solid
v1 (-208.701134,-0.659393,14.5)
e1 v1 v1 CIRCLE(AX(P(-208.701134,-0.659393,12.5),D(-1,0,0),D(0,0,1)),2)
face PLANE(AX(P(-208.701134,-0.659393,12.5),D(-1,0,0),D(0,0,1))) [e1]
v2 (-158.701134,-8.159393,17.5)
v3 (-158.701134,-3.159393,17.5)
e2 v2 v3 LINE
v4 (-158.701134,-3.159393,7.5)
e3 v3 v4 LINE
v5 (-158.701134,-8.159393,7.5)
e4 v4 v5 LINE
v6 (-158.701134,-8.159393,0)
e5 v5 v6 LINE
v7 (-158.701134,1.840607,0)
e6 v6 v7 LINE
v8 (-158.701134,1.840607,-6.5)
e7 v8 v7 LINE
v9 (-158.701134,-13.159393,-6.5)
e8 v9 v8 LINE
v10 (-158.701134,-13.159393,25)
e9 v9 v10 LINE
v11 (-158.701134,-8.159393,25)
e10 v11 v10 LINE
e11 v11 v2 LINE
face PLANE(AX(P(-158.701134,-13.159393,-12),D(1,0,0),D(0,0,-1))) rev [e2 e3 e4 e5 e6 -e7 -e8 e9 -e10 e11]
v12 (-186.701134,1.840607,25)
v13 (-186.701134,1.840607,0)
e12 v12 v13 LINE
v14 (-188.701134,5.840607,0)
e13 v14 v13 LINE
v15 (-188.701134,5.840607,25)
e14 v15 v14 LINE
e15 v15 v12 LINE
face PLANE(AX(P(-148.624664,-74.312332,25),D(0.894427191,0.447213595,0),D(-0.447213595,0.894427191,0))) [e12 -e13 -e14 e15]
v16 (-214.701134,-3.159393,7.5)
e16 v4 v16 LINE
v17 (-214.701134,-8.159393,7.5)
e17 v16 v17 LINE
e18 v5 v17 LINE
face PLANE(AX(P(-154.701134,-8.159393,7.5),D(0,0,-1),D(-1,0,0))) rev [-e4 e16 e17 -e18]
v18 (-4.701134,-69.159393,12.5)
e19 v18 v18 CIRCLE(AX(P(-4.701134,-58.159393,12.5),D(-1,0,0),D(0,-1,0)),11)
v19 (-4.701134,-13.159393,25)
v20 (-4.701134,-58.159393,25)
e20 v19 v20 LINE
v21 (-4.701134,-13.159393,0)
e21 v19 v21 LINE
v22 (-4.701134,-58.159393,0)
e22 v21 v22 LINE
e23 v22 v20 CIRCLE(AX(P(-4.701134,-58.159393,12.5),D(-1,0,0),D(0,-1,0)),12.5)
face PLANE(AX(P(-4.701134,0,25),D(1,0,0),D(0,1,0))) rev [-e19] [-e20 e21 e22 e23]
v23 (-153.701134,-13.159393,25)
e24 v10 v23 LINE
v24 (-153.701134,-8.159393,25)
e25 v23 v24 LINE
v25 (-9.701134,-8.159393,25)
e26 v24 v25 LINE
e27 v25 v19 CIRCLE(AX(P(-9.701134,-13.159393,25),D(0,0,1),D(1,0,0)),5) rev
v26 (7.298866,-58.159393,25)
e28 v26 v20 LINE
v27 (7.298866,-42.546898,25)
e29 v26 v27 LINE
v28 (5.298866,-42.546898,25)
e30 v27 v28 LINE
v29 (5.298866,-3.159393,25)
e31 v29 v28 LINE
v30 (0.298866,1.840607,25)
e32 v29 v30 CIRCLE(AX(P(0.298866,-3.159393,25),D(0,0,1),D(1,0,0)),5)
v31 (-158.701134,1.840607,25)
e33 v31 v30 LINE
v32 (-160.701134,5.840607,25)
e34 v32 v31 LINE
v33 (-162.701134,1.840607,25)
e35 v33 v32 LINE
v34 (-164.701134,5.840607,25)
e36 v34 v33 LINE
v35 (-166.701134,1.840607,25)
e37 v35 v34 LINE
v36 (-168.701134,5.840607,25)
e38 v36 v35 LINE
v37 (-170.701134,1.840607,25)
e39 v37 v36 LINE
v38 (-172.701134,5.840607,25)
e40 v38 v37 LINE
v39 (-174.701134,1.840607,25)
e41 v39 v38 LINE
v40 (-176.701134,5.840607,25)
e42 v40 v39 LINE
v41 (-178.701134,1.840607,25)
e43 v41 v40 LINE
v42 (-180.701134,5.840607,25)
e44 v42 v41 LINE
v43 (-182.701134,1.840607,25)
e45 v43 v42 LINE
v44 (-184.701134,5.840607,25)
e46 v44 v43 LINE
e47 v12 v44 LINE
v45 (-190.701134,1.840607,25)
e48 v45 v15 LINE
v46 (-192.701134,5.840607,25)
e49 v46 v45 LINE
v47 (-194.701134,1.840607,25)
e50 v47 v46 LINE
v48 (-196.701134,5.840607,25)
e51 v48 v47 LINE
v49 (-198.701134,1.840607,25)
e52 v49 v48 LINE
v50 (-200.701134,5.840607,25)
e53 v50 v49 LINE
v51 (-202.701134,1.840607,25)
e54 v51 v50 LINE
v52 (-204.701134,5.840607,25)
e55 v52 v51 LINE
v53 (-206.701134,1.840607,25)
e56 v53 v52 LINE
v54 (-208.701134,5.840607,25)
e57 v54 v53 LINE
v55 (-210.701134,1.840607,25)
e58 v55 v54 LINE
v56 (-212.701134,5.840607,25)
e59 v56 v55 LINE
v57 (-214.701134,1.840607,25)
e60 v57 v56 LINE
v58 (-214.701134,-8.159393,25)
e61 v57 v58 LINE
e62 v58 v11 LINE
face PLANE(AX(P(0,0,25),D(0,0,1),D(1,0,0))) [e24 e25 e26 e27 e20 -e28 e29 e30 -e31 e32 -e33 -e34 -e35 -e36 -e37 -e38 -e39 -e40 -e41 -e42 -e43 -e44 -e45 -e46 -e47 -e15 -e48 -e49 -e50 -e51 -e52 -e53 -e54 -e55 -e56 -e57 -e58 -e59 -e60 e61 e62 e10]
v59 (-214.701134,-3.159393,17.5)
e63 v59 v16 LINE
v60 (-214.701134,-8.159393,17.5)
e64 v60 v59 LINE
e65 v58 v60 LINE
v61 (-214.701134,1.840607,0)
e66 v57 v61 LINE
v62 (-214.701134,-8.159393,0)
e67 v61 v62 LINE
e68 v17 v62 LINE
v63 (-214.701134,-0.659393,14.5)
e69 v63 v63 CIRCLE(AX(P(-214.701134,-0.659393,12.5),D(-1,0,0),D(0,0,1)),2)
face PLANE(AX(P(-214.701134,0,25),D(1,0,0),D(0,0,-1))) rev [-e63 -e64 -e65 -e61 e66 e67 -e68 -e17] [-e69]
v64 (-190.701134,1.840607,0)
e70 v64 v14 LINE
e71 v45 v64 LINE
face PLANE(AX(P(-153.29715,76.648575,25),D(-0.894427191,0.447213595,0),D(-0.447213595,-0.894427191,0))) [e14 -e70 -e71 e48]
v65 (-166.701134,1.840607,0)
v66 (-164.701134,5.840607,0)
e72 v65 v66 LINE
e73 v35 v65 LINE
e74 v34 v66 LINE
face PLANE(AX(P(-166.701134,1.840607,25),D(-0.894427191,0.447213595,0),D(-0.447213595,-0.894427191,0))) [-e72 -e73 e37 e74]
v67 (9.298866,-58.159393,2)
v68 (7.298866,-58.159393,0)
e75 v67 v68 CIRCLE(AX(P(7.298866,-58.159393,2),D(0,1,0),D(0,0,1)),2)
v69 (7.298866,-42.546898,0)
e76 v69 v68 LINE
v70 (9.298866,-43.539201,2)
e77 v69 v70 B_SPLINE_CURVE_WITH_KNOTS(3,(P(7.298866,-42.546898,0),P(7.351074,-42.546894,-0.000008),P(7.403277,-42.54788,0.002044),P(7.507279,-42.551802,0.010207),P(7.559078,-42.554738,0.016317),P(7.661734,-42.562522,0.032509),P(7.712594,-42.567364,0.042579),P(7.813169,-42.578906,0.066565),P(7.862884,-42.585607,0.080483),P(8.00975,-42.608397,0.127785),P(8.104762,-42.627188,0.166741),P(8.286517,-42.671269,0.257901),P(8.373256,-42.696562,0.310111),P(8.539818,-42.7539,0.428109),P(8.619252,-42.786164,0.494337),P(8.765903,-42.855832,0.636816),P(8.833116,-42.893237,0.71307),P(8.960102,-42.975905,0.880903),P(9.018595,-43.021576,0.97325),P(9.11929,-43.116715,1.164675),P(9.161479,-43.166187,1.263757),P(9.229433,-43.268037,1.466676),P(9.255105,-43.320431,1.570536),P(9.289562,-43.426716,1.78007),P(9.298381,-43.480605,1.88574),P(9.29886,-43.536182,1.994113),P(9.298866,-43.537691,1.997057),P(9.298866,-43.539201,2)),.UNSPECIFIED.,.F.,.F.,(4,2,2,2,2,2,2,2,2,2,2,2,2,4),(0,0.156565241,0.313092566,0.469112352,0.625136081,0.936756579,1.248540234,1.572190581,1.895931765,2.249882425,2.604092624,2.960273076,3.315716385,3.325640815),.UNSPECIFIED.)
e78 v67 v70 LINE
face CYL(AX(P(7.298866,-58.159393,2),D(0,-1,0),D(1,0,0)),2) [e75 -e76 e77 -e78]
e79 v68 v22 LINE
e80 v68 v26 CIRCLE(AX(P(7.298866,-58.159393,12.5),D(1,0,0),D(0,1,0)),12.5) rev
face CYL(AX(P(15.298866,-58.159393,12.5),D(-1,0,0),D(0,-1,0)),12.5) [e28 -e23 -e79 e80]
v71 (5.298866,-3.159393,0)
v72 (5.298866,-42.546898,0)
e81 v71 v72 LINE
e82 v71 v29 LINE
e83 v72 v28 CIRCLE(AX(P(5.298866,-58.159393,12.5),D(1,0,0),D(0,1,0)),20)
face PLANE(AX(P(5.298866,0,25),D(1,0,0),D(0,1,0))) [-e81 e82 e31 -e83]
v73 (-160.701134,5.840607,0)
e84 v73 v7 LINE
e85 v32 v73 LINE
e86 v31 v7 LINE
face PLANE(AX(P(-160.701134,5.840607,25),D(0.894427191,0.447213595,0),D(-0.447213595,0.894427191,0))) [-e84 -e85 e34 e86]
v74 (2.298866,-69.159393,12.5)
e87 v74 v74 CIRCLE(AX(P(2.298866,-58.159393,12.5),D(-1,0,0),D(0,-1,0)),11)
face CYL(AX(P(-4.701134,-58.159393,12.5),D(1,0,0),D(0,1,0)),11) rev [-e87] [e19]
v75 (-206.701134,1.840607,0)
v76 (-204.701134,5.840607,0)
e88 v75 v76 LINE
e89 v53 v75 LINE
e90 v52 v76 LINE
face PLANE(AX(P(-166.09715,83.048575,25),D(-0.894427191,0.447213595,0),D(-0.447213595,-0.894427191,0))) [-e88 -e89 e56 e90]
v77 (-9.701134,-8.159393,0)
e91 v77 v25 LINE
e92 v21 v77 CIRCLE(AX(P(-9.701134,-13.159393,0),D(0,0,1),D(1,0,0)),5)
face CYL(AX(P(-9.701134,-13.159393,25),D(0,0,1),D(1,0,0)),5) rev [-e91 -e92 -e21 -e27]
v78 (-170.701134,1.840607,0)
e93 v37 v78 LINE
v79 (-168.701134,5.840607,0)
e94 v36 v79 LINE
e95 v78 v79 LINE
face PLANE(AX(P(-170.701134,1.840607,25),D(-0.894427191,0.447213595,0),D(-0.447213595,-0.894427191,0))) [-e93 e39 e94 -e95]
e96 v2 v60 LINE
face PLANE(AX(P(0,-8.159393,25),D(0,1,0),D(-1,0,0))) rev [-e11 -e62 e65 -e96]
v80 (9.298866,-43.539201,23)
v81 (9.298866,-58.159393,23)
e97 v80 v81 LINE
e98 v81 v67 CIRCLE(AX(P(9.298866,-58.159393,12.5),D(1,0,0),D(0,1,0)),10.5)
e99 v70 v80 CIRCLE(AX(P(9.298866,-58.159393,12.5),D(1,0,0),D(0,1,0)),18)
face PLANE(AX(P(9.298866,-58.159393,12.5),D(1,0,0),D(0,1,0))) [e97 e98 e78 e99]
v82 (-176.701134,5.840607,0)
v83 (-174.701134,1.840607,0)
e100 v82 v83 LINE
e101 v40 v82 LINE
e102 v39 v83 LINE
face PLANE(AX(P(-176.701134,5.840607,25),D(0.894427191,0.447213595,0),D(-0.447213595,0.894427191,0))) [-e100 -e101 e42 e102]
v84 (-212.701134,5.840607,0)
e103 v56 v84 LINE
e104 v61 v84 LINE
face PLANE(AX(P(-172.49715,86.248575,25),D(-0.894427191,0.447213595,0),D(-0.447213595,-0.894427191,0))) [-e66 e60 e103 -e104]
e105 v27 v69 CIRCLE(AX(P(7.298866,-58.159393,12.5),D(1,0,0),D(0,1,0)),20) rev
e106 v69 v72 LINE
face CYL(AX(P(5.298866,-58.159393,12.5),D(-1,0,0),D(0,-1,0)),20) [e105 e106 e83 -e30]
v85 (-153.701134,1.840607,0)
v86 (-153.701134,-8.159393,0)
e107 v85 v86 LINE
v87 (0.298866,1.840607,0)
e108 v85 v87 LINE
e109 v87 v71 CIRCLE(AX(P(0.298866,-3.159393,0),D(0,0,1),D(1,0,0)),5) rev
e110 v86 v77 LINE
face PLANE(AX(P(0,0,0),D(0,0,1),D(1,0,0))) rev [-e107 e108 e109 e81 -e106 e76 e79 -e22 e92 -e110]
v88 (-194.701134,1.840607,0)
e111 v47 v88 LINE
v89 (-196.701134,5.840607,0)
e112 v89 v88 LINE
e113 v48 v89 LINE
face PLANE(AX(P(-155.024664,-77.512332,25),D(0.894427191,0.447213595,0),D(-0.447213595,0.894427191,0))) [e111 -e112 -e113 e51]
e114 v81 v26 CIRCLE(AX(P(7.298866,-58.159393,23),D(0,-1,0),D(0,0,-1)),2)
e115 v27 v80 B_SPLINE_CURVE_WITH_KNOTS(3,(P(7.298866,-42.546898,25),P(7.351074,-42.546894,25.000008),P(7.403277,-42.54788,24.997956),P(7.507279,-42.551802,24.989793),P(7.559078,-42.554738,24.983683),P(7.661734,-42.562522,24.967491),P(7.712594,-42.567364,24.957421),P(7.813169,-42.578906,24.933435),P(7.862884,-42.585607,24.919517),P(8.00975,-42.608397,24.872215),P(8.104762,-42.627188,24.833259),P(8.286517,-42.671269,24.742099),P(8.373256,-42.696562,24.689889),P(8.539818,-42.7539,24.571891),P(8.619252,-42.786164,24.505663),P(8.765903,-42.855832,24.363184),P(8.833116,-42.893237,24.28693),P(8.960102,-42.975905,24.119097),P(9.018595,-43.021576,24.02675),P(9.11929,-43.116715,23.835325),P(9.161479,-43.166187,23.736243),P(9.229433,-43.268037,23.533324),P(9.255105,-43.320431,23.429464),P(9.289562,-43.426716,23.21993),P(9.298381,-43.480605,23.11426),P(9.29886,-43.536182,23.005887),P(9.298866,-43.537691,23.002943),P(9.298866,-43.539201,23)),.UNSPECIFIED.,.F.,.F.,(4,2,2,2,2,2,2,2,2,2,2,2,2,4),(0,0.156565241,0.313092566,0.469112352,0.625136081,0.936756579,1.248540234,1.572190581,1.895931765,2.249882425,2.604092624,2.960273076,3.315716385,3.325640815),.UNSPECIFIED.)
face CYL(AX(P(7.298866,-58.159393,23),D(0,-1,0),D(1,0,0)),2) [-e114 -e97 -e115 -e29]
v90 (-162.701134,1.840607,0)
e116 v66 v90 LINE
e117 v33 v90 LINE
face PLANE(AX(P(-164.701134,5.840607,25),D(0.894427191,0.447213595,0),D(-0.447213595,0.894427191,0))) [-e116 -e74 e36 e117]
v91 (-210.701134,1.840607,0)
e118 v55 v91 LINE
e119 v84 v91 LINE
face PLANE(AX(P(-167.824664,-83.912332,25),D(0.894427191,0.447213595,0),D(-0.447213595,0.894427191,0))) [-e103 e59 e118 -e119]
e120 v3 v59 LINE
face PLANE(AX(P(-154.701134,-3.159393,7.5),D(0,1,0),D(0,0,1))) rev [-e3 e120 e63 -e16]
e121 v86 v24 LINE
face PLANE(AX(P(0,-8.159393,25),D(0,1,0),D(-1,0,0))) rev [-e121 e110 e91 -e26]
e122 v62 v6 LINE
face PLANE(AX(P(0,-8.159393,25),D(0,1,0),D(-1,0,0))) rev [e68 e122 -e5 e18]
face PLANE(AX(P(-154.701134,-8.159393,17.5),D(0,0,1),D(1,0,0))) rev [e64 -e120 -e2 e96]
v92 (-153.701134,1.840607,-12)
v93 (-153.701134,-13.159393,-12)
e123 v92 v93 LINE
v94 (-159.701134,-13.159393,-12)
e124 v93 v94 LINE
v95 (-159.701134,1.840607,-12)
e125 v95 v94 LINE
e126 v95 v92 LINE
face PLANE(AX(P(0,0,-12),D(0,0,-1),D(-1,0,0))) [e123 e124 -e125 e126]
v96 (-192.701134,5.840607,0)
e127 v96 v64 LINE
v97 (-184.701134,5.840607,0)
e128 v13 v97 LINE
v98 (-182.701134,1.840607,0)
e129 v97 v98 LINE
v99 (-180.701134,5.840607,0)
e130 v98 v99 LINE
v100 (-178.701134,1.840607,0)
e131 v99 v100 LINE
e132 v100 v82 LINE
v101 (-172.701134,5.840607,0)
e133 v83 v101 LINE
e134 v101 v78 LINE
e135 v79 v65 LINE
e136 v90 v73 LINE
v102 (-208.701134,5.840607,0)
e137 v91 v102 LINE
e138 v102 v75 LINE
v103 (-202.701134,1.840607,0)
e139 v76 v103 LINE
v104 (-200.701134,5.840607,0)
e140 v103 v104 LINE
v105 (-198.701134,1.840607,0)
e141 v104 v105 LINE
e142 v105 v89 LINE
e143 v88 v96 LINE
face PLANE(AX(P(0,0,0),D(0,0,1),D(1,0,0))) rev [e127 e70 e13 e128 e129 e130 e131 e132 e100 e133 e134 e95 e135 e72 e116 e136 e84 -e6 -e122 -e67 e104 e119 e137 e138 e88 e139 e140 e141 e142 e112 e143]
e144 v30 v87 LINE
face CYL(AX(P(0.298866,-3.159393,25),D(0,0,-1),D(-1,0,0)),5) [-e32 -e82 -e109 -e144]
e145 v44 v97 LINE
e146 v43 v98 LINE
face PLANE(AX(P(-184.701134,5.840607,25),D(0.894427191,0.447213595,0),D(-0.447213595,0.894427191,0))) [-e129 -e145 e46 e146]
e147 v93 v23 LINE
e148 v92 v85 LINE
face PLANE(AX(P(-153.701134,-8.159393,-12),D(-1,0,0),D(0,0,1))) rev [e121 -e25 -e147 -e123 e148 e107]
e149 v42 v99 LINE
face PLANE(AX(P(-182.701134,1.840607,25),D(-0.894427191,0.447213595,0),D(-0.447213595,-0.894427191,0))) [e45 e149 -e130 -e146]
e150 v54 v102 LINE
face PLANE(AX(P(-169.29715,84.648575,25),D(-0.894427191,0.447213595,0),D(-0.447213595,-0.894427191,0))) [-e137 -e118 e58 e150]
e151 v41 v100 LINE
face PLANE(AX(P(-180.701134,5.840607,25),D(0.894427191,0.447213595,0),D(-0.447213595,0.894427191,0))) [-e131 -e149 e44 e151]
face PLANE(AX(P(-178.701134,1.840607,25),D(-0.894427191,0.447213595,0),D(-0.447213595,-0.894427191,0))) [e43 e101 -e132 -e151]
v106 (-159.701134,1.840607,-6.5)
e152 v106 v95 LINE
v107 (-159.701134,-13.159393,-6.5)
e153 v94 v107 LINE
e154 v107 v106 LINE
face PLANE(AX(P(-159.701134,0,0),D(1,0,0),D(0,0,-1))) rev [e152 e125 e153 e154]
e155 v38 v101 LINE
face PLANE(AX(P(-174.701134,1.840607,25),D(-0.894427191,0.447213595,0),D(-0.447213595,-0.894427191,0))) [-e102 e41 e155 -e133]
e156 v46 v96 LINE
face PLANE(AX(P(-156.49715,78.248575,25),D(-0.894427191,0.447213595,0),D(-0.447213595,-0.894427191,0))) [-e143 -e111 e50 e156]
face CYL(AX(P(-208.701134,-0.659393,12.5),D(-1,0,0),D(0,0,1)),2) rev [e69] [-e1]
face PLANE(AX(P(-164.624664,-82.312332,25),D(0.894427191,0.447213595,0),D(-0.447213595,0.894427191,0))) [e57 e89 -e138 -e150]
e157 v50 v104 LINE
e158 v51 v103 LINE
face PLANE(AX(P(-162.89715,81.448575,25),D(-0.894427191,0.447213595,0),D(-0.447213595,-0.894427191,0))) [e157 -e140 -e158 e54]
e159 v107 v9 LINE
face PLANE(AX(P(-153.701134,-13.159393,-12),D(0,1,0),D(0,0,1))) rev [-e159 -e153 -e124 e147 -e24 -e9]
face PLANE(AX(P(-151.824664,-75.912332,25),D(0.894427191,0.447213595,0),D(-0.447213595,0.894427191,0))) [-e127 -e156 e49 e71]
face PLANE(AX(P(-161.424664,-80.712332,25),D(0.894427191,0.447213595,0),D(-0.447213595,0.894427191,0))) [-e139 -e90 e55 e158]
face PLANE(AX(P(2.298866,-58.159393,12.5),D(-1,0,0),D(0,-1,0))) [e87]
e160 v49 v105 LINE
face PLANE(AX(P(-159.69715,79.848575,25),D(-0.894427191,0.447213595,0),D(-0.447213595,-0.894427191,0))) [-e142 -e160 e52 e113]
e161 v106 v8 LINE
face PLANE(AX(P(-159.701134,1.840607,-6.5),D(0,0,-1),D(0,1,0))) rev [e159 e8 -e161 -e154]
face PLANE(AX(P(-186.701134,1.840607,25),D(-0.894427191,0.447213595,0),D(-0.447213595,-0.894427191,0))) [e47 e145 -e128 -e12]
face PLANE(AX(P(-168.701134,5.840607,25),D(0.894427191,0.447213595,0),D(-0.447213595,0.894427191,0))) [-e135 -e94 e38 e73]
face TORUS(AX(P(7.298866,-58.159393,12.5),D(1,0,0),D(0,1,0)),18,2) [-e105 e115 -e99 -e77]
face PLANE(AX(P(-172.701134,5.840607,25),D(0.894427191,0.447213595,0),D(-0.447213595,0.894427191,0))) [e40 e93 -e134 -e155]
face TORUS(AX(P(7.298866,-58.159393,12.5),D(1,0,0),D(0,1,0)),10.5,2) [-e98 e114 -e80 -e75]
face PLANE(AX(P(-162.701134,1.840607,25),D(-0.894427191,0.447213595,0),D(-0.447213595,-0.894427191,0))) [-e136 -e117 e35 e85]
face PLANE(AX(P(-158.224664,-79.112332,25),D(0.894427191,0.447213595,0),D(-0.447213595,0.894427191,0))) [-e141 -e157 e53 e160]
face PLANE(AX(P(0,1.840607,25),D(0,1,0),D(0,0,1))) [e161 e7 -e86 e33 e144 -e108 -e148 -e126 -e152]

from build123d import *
from build123d.topology import SkipClean

# Parameters (mm, degrees)
BOSS_EXTRU_1_DEPTH      = 25
BOSS_EXTRU_2_DEPTH      = 12.5
ESQUISSE3_R             = 20
ESQUISSE3_R_2           = 15
BOSS_EXTRU_3_DEPTH      = 10
ENL_V_MAT_EXTRU_1_DEPTH = 227.418066155
ESQUISSE5_W             = 10
ESQUISSE5_H             = 5
ENL_V_MAT_EXTRU_2_DEPTH = 60
ESQUISSE6_R             = 20
BOSS_EXTRU_4_DEPTH      = 4
ESQUISSE8_R             = 2
ENL_V_MAT_EXTRU_4_DEPTH = 6
ESQUISSE10_W            = 5
ESQUISSE10_H            = 10
BOSS_EXTRU_5_DEPTH      = 10
BOSS_EXTRU_6_DEPTH      = 12
BOSS_EXTRU_8_START      = 10
ESQUISSE12_R            = 15
ESQUISSE12_R_2          = 11
BOSS_EXTRU_8_DEPTH      = 10
ENL_V_MAT_EXTRU_5_DEPTH = 20
CONG_1_R                = 2
BOSS_EXTRU_9_START      = 3
ESQUISSE14_R            = 11
BOSS_EXTRU_9_DEPTH      = 3
CONG_2_R                = 5
ESQUISSE16_W            = 5.5
ESQUISSE16_H            = 15
BOSS_EXTRU_10_DEPTH     = 1
ESQUISSE18_W            = 10.448813292
ESQUISSE18_H            = 10
ENL_V_MAT_EXTRU_8_DEPTH = 6
ESQUISSE19_W            = 5
ESQUISSE19_H            = 14.911099914
BOSS_EXTRU_11_DEPTH     = 25


with BuildPart() as part:
    # Esquisse1 → Boss.-Extru.1 (new body)
    with BuildSketch(Plane.XY):
        Polygon((5.298866479, 1.840607211), (-214.701133521, 1.840607211), (-214.701133521, -8.159392789), (-4.701133521, -8.159392789), (-4.701133521, -78.159392789), (5.298866479, -78.159392789), align=None)
    extrude(amount=BOSS_EXTRU_1_DEPTH)

    # Esquisse2 → Boss.-Extru.2 (add, symmetric)
    with BuildSketch(Plane.XY.offset(12.5)):
        Polygon((-160.701133521, 5.840607211), (-162.701133521, 1.840607211), (-158.701133521, 1.840607211), align=None)
        Polygon((-164.701133521, 5.840607211), (-166.701133521, 1.840607211), (-162.701133521, 1.840607211), align=None)
        Polygon((-168.701133521, 5.840607211), (-170.701133521, 1.840607211), (-166.701133521, 1.840607211), align=None)
        Polygon((-172.701133521, 5.840607211), (-174.701133521, 1.840607211), (-170.701133521, 1.840607211), align=None)
        Polygon((-176.701133521, 5.840607211), (-178.701133521, 1.840607211), (-174.701133521, 1.840607211), align=None)
        Polygon((-180.701133521, 5.840607211), (-182.701133521, 1.840607211), (-178.701133521, 1.840607211), align=None)
        Polygon((-184.701133521, 5.840607211), (-186.701133521, 1.840607211), (-182.701133521, 1.840607211), align=None)
        Polygon((-188.701133521, 5.840607211), (-190.701133521, 1.840607211), (-186.701133521, 1.840607211), align=None)
        Polygon((-192.701133521, 5.840607211), (-194.701133521, 1.840607211), (-190.701133521, 1.840607211), align=None)
        Polygon((-196.701133521, 5.840607211), (-198.701133521, 1.840607211), (-194.701133521, 1.840607211), align=None)
        Polygon((-200.701133521, 5.840607211), (-202.701133521, 1.840607211), (-198.701133521, 1.840607211), align=None)
        Polygon((-204.701133521, 5.840607211), (-206.701133521, 1.840607211), (-202.701133521, 1.840607211), align=None)
        Polygon((-208.701133521, 5.840607211), (-210.701133521, 1.840607211), (-206.701133521, 1.840607211), align=None)
        Polygon((-212.701133521, 5.840607211), (-214.701133521, 1.840607211), (-210.701133521, 1.840607211), align=None)
    extrude(amount=BOSS_EXTRU_2_DEPTH, both=True)

    # Esquisse3 → Boss.-Extru.3 (add)
    with BuildSketch(Plane.ZY.offset(4.701133521)):
        with Locations((12.5, -58.159392789)):
            Circle(ESQUISSE3_R)
        with Locations((12.5, -58.159392789)):
            Circle(ESQUISSE3_R_2, mode=Mode.SUBTRACT)
    extrude(amount=-BOSS_EXTRU_3_DEPTH)

    # Esquisse4 → Enlèv. mat.-Extru.1 (cut, through all)
    with BuildSketch(Plane.ZY.offset(4.701133521)):
        with BuildLine():
            ThreePointArc((12.5, -78.159392789), (5.876175573, -77.03066593), (0, -73.771887785))
            Line((0, -73.771887785), (0, -78.159392789))
            Line((0, -78.159392789), (12.5, -78.159392789))
        make_face()
        with BuildLine():
            Line((25, -78.159392789), (25, -73.771887785))
            ThreePointArc((25, -73.771887785), (19.123824427, -77.03066593), (12.5, -78.159392789))
            Line((12.5, -78.159392789), (25, -78.159392789))
        make_face()
        with BuildLine():
            Line((25, -66.450954765), (25, -49.867830813))
            ThreePointArc((25, -49.867830813), (12.5, -43.159392789), (0, -49.867830813))
            Line((0, -49.867830813), (0, -66.450954765))
            ThreePointArc((0, -66.450954765), (12.5, -73.159392789), (25, -66.450954765))
        make_face()
    extrude(amount=-ENL_V_MAT_EXTRU_1_DEPTH, mode=Mode.SUBTRACT)

    # Esquisse5 → Enlèv. mat.-Extru.2 (cut)
    with BuildSketch(Plane.ZY.offset(214.701133521)):
        with Locations((12.5, -5.659392789)):
            Rectangle(ESQUISSE5_W, ESQUISSE5_H)
    extrude(amount=-ENL_V_MAT_EXTRU_2_DEPTH, mode=Mode.SUBTRACT)

    # Esquisse6 → Boss.-Extru.4 (add)
    with SkipClean():  # the faces are left unmerged after this step: merging them gives an invalid solid
        with BuildSketch(Plane(origin=(5.298866479, 0, 0), x_dir=(0, 0, -1), z_dir=(1, 0, 0))):
            with Locations((-12.5, -58.159392789)):
                Circle(ESQUISSE6_R)
        extrude(amount=BOSS_EXTRU_4_DEPTH)
    add(part.part.scale(1), mode=Mode.REPLACE)  # the faces are merged on a copy

    # Esquisse8 → Enlèv. mat.-Extru.4 (cut)
    with BuildSketch(Plane.ZY.offset(214.701133521)):
        with Locations((12.5, -0.659392789)):
            Circle(ESQUISSE8_R)
    extrude(amount=-ENL_V_MAT_EXTRU_4_DEPTH, mode=Mode.SUBTRACT)

    # Esquisse10 → Boss.-Extru.5 (add)
    with BuildSketch(Plane.XY.offset(25)):
        with Locations((-156.201133521, -3.159392789)):
            Rectangle(ESQUISSE10_W, ESQUISSE10_H)
    extrude(amount=BOSS_EXTRU_5_DEPTH)

    # Esquisse11 → Boss.-Extru.6 (add)
    with SkipClean():  # the faces are left unmerged after this step: merging them gives an invalid solid
        with BuildSketch(Plane(origin=(0, 0, 0), x_dir=(-1, 0, 0), z_dir=(0, 0, -1))):
            Polygon((153.701133521, -8.159392789), (153.701133521, -13.159392789), (158.701133521, -13.159392789), (158.701133521, -8.159392789), (158.701133521, 1.840607211), (153.701133521, 1.840607211), align=None)
        extrude(amount=BOSS_EXTRU_6_DEPTH)

    # Esquisse12 → Boss.-Extru.8 (add)
    with SkipClean():  # the faces are left unmerged after this step: merging them gives an invalid solid
        with BuildSketch(Plane.ZY.offset(-5.298866479).offset(BOSS_EXTRU_8_START)):
            with Locations((12.5, -58.159392789)):
                Circle(ESQUISSE12_R)
            with Locations((12.5, -58.159392789)):
                Circle(ESQUISSE12_R_2, mode=Mode.SUBTRACT)
        extrude(amount=-BOSS_EXTRU_8_DEPTH)

    # Esquisse13 → Enlèv. mat.-Extru.5 (cut)
    with BuildSketch(Plane.ZY.offset(4.701133521)):
        with BuildLine():
            Line((0, -58.159392789), (0, -42.546897793))
            ThreePointArc((0, -42.546897793), (3.839745962, -76.187149167), (32.5, -58.159392789))
            ThreePointArc((32.5, -58.159392789), (30.527756377, -49.499138752), (25, -42.546897793))
            Line((25, -42.546897793), (25, -58.159392789))
            ThreePointArc((25, -58.159392789), (12.5, -70.659392789), (0, -58.159392789))
        make_face()
    extrude(amount=-ENL_V_MAT_EXTRU_5_DEPTH, mode=Mode.SUBTRACT)

    # Congé1
    cong_1_edges = [part.edges().sort_by_distance(p)[0] for p in [
        (9.298866479, -50.353145291, 0),
        (9.298866479, -70.659392789, 12.5),
        (9.298866479, -50.353145291, 25),
        (9.298866479, -38.159392789, 12.5),
    ]]
    fillet(cong_1_edges, radius=CONG_1_R)

    # Esquisse14 → Boss.-Extru.9 (add)
    with BuildSketch(Plane.ZY.offset(-5.298866479).offset(BOSS_EXTRU_9_START)):
        with Locations((12.5, -58.159392789)):
            Circle(ESQUISSE14_R)
    extrude(amount=-BOSS_EXTRU_9_DEPTH)

    # Congé2
    cong_2_edges = [part.edges().sort_by_distance(p)[0] for p in [
        (-4.701133521, -8.159392789, 12.5),
        (5.298866479, 1.840607211, 12.5),
    ]]
    fillet(cong_2_edges, radius=CONG_2_R)

    # Esquisse16 → Boss.-Extru.10 (add)
    with BuildSketch(Plane.ZY.offset(158.701133521)):
        with Locations((-9.25, -5.659392789)):
            Rectangle(ESQUISSE16_W, ESQUISSE16_H)
    extrude(amount=BOSS_EXTRU_10_DEPTH)

    # Esquisse18 → Enlèv. mat.-Extru.8 (cut)
    with BuildSketch(Plane.ZY.offset(158.701133521)):
        with Locations((30.224406646, -3.159392789)):
            Rectangle(ESQUISSE18_W, ESQUISSE18_H)
    extrude(amount=-ENL_V_MAT_EXTRU_8_DEPTH, mode=Mode.SUBTRACT)

    # Esquisse19 → Boss.-Extru.11 (add)
    with BuildSketch(Plane.XY):
        with Locations((-156.201133521, -5.703842832)):
            Rectangle(ESQUISSE19_W, ESQUISSE19_H)
    extrude(amount=BOSS_EXTRU_11_DEPTH)


solid = part.part
